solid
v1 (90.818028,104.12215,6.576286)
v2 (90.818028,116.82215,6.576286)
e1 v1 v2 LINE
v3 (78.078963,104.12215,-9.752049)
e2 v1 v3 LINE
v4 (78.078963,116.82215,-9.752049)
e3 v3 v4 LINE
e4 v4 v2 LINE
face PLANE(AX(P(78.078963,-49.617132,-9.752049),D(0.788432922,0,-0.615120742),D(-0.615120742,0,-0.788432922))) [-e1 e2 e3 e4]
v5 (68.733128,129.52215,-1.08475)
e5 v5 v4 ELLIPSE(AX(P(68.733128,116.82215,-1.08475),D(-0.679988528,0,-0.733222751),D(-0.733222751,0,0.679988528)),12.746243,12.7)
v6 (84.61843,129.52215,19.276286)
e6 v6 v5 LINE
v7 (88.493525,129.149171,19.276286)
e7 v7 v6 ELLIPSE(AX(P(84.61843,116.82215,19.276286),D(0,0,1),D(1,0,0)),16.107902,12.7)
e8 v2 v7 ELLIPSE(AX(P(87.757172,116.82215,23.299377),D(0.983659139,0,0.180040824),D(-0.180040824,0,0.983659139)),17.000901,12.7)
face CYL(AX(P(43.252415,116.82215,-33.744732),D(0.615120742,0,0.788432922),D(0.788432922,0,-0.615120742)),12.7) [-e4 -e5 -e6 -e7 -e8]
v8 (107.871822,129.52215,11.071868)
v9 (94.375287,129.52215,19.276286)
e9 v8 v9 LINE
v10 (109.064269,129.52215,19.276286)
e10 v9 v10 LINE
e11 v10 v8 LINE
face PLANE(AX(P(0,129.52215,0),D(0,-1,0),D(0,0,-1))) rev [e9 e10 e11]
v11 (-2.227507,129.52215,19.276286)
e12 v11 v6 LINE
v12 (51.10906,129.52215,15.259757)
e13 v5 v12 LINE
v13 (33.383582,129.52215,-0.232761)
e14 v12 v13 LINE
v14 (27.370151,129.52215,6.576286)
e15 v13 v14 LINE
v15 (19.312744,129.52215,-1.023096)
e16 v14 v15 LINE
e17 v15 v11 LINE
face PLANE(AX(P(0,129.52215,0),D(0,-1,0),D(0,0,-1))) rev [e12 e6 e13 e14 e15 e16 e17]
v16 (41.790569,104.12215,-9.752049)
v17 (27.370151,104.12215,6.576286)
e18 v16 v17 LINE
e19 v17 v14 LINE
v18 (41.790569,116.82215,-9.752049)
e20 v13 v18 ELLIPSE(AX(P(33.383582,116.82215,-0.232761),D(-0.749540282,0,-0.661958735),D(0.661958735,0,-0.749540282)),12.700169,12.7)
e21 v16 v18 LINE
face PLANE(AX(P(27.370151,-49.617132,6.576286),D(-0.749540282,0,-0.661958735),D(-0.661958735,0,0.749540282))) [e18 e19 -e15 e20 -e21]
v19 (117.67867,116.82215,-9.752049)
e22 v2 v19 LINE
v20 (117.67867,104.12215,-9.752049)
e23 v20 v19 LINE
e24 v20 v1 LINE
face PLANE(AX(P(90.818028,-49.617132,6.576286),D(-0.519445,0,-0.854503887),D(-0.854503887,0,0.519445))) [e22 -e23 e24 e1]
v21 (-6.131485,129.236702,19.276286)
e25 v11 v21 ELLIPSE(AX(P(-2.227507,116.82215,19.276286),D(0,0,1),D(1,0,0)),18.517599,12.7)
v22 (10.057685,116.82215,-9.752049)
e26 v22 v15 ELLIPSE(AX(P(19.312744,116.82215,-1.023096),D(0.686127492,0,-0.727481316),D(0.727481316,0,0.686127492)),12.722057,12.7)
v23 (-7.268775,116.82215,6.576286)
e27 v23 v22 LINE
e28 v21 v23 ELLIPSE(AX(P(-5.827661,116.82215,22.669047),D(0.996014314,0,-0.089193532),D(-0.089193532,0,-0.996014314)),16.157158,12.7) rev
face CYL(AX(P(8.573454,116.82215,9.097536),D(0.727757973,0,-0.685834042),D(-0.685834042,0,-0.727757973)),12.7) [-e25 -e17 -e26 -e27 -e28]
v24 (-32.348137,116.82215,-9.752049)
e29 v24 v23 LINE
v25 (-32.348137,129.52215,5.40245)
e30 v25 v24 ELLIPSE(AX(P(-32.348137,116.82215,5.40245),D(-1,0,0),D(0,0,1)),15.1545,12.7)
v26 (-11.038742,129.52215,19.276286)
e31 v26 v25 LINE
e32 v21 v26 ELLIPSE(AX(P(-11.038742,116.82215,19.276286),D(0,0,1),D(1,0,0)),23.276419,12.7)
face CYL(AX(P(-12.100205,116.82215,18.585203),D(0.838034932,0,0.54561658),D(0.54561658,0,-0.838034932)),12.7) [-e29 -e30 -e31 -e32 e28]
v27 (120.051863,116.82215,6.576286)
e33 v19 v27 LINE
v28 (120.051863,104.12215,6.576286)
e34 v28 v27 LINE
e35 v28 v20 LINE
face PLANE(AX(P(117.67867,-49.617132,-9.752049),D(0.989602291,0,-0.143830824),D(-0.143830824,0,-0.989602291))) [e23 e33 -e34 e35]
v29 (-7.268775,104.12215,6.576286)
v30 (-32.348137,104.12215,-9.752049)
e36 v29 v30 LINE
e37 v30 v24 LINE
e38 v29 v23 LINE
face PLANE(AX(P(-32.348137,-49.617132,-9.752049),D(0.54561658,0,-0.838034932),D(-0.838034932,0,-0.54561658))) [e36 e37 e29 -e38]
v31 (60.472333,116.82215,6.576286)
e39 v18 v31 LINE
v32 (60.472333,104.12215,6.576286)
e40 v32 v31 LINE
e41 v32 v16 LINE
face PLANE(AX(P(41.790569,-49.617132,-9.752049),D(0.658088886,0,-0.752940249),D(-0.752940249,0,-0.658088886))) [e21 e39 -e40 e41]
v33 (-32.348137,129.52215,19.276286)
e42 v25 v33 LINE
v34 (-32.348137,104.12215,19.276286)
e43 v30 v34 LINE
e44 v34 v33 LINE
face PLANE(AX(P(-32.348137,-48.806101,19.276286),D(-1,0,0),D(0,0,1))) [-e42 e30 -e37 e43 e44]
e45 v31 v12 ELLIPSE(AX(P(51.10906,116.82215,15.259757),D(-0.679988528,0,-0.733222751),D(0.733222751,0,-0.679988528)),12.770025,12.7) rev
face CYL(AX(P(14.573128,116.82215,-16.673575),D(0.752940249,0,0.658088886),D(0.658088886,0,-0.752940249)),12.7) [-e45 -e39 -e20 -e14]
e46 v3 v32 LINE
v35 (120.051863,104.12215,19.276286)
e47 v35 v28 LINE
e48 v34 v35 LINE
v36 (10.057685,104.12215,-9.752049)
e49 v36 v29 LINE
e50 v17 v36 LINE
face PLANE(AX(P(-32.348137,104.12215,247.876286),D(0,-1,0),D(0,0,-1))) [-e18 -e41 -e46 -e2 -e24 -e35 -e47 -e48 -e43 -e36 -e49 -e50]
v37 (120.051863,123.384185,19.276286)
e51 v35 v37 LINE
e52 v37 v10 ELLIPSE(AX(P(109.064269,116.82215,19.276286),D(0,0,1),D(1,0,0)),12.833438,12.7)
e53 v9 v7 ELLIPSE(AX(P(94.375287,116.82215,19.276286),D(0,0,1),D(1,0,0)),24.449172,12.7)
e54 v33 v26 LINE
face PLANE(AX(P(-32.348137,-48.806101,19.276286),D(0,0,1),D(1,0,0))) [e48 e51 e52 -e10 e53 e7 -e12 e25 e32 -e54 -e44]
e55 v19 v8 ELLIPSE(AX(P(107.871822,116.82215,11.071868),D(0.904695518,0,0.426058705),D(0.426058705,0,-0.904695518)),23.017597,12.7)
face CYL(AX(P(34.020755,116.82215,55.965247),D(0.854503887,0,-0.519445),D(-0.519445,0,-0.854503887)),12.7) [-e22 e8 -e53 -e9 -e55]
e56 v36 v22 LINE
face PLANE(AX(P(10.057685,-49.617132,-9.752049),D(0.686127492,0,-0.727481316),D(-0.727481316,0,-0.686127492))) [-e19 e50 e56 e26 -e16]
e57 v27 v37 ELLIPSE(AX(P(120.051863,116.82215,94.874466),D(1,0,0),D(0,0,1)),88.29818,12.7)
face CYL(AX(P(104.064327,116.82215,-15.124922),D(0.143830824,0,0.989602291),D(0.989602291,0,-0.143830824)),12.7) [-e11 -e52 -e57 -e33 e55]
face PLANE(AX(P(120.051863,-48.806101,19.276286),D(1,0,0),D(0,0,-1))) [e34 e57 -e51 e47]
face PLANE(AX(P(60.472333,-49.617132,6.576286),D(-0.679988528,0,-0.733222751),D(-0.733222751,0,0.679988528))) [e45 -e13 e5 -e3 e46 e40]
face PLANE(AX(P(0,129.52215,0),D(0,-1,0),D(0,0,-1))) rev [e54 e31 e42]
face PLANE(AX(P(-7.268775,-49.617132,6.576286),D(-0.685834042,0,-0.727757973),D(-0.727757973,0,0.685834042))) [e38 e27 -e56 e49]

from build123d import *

# Parameters (mm, degrees)
SKETCH1_W           = 152.4
SKETCH1_H           = 12.7
BOSS_EXTRUDE1_DEPTH = 25.4
BOSS_EXTRUDE2_DEPTH = 25.4
FILLET2_R           = 12.7


with BuildPart() as part:
    # Sketch1 → Boss-Extrude1 (new body)
    with BuildSketch(Plane(origin=(0, 129.522150418, 0), x_dir=(1, 0, 0), z_dir=(0, 1, 0))):
        with Locations((43.851863223, -12.926286206)):
            Rectangle(SKETCH1_W, SKETCH1_H)
    extrude(amount=-BOSS_EXTRUDE1_DEPTH)

    # Sketch2 → Boss-Extrude2 (add)
    with BuildSketch(Plane(origin=(0, 129.522150418, 0), x_dir=(1, 0, 0), z_dir=(0, 1, 0))):
        Polygon((-32.348136777, -6.576286206), (-32.348136777, 9.752049173), (-7.268775287, -6.576286206), (10.057684935, 9.752049173), (27.370150986, -6.576286206), (41.790569064, 9.752049173), (60.472332517, -6.576286206), (78.078963356, 9.752049173), (90.818027749, -6.576286206), (117.678669506, 9.752049173), (120.051863223, -6.576286206), (120.051863223, -10.496577103), (-32.348136777, -10.496577103), align=None)
    extrude(amount=-BOSS_EXTRUDE2_DEPTH)

    # Fillet2
    # the kernel refuses this fillet: 12.7 mm, written as the material it takes off along each edge
    with BuildSketch(Plane(origin=(-58.955745883, 129.522150418, -27.075375577), x_dir=(0, -1, 0), z_dir=(0.8380349324532734, 0, 0.5456165796491502))) as fillet2_piece_1_section:
        with BuildLine():
            CenterArc((FILLET2_R, -FILLET2_R), FILLET2_R, 90, 90)
            Line((0, -FILLET2_R), (0, 0))
            Line((0, 0), (FILLET2_R, 0))
        make_face()
    fillet2_piece_1 = extrude(amount=93.426391514, mode=Mode.PRIVATE)
    fillet2_piece_1 = split(fillet2_piece_1, bisect_by=Plane(origin=(-14.62978652, 126.629320204, 13.5132519), z_dir=(-0.6858340421816573, 0, -0.7277579725326055)), keep=Keep.TOP, mode=Mode.PRIVATE)
    add(fillet2_piece_1, mode=Mode.SUBTRACT)
    with BuildSketch(Plane(origin=(-30.375090914, 129.522150418, 28.351517045), x_dir=(0, -1, 0), z_dir=(0.7277579725326055, 0, -0.6858340421816573))) as fillet2_piece_2_section:
        with BuildLine():
            CenterArc((FILLET2_R, -FILLET2_R), FILLET2_R, 90, 90)
            Line((0, -FILLET2_R), (0, 0))
            Line((0, 0), (FILLET2_R, 0))
        make_face()
    fillet2_piece_2 = extrude(amount=87.307997817, mode=Mode.PRIVATE)
    fillet2_piece_2 = split(fillet2_piece_2, bisect_by=Plane(origin=(0.600633599, 126.627355979, 11.699795733), z_dir=(0.5456165796491502, 0, -0.8380349324532734)), keep=Keep.TOP, mode=Mode.PRIVATE)
    add(fillet2_piece_2, mode=Mode.SUBTRACT)
    with BuildSketch(Plane(origin=(113.112040831, 129.522150418, -41.171921906), x_dir=(0, -1, 0), z_dir=(0.14383082440379222, 0, 0.9896022907973312))) as fillet2_piece_3:
        with BuildLine():
            CenterArc((FILLET2_R, -FILLET2_R), FILLET2_R, 90, 90)
            Line((0, -FILLET2_R), (0, 0))
            Line((0, 0), (FILLET2_R, 0))
        make_face()
    extrude(amount=79.999896505, mode=Mode.SUBTRACT)
    with BuildSketch(Plane(origin=(63.687529345, 129.522150418, 23.068664941), x_dir=(0, -1, 0), z_dir=(0.8545038867379449, 0, -0.5194449995425362))) as fillet2_piece_4_section:
        with BuildLine():
            CenterArc((FILLET2_R, -FILLET2_R), FILLET2_R, 90, 90)
            Line((0, -FILLET2_R), (0, 0))
            Line((0, 0), (FILLET2_R, 0))
        make_face()
    fillet2_piece_4 = extrude(amount=94.934194945, mode=Mode.PRIVATE)
    fillet2_piece_4 = split(fillet2_piece_4, bisect_by=Plane(origin=(94.83379058, 126.638697733, 11.723502696), z_dir=(0.7884329224399922, 0, -0.61512074165381)), keep=Keep.TOP, mode=Mode.PRIVATE)
    add(fillet2_piece_4, mode=Mode.SUBTRACT)
    with BuildSketch(Plane(origin=(58.548879808, 129.522150418, -34.784794461), x_dir=(0, -1, 0), z_dir=(0.61512074165381, 0, 0.7884329224399922))) as fillet2_piece_5_section:
        with BuildLine():
            CenterArc((FILLET2_R, -FILLET2_R), FILLET2_R, 90, 90)
            Line((0, -FILLET2_R), (0, 0))
            Line((0, 0), (FILLET2_R, 0))
        make_face()
    fillet2_piece_5 = extrude(amount=84.209859919, mode=Mode.PRIVATE)
    fillet2_piece_5 = split(fillet2_piece_5, bisect_by=Plane(origin=(85.773780616, 126.63700346, 9.642637325), z_dir=(-0.5194449995425363, 0, -0.8545038867379451)), keep=Keep.TOP, mode=Mode.PRIVATE)
    add(fillet2_piece_5, mode=Mode.SUBTRACT)
    with BuildSketch(Plane(origin=(17.884716168, 129.522150418, -30.646371305), x_dir=(0, -1, 0), z_dir=(0.7529402486677585, 0, 0.6580888860451405))) as fillet2_piece_6_section:
        with BuildLine():
            CenterArc((FILLET2_R, -FILLET2_R), FILLET2_R, 90, 90)
            Line((0, -FILLET2_R), (0, 0))
            Line((0, 0), (FILLET2_R, 0))
        make_face()
    fillet2_piece_6 = extrude(amount=88.311747661, mode=Mode.PRIVATE)
    fillet2_piece_6 = split(fillet2_piece_6, bisect_by=Plane(origin=(56.205808832, 126.638654996, 10.533047171), z_dir=(-0.6799885276956249, 0, -0.7332227507397301)), keep=Keep.TOP, mode=Mode.PRIVATE)
    add(fillet2_piece_6, mode=Mode.SUBTRACT)
    with BuildSketch(Plane(origin=(-58.955745883, 129.522150418, -27.075375577), x_dir=(0, -1, 0), z_dir=(0.8380349324532734, 0, 0.5456165796491502))) as fillet2_piece_7a_section:
        with BuildLine():
            CenterArc((FILLET2_R, -FILLET2_R), FILLET2_R, 90, 90)
            Line((0, -FILLET2_R), (0, 0))
            Line((0, 0), (FILLET2_R, 0))
        make_face()
    fillet2_piece_7a = extrude(amount=93.426391514, mode=Mode.PRIVATE)
    fillet2_piece_7a = split(fillet2_piece_7a, bisect_by=Plane(origin=(-6.679987246, 126.680031692, 6.021416459), z_dir=(0.6858340421816573, 0, 0.7277579725326055)), keep=Keep.TOP, mode=Mode.PRIVATE)
    with BuildSketch(Plane(origin=(-30.375090914, 129.522150418, 28.351517045), x_dir=(0, -1, 0), z_dir=(0.7277579725326055, 0, -0.6858340421816573))) as fillet2_piece_7b_section:
        with BuildLine():
            CenterArc((FILLET2_R, -FILLET2_R), FILLET2_R, 90, 90)
            Line((0, -FILLET2_R), (0, 0))
            Line((0, 0), (FILLET2_R, 0))
        make_face()
    fillet2_piece_7b = extrude(amount=87.307997817, mode=Mode.PRIVATE)
    fillet2_piece_7b = split(fillet2_piece_7b, bisect_by=Plane(origin=(-7.946782213, 126.680031692, 6.134858521), z_dir=(-0.5456165796491502, 0, 0.8380349324532734)), keep=Keep.TOP, mode=Mode.PRIVATE)
    fillet2_piece_7 = fillet2_piece_7a & fillet2_piece_7b
    add(fillet2_piece_7, mode=Mode.SUBTRACT)
    with BuildSketch(Plane(origin=(58.548879808, 129.522150418, -34.784794461), x_dir=(0, -1, 0), z_dir=(0.61512074165381, 0, 0.7884329224399922))) as fillet2_piece_8a_section:
        with BuildLine():
            CenterArc((FILLET2_R, -FILLET2_R), FILLET2_R, 90, 90)
            Line((0, -FILLET2_R), (0, 0))
            Line((0, 0), (FILLET2_R, 0))
        make_face()
    fillet2_piece_8a = extrude(amount=84.209859919, mode=Mode.PRIVATE)
    fillet2_piece_8a = split(fillet2_piece_8a, bisect_by=Plane(origin=(89.912348573, 126.663062173, 7.126840189), z_dir=(0.5194449995425363, 0, 0.8545038867379451)), keep=Keep.TOP, mode=Mode.PRIVATE)
    with BuildSketch(Plane(origin=(63.687529345, 129.522150418, 23.068664941), x_dir=(0, -1, 0), z_dir=(0.8545038867379449, 0, -0.5194449995425362))) as fillet2_piece_8b_section:
        with BuildLine():
            CenterArc((FILLET2_R, -FILLET2_R), FILLET2_R, 90, 90)
            Line((0, -FILLET2_R), (0, 0))
            Line((0, 0), (FILLET2_R, 0))
        make_face()
    fillet2_piece_8b = extrude(amount=94.934194945, mode=Mode.PRIVATE)
    fillet2_piece_8b = split(fillet2_piece_8b, bisect_by=Plane(origin=(91.469987388, 126.663062173, 7.4119375), z_dir=(-0.7884329224399922, 0, 0.61512074165381)), keep=Keep.TOP, mode=Mode.PRIVATE)
    fillet2_piece_8 = fillet2_piece_8a & fillet2_piece_8b
    add(fillet2_piece_8, mode=Mode.SUBTRACT)


solid = part.part
